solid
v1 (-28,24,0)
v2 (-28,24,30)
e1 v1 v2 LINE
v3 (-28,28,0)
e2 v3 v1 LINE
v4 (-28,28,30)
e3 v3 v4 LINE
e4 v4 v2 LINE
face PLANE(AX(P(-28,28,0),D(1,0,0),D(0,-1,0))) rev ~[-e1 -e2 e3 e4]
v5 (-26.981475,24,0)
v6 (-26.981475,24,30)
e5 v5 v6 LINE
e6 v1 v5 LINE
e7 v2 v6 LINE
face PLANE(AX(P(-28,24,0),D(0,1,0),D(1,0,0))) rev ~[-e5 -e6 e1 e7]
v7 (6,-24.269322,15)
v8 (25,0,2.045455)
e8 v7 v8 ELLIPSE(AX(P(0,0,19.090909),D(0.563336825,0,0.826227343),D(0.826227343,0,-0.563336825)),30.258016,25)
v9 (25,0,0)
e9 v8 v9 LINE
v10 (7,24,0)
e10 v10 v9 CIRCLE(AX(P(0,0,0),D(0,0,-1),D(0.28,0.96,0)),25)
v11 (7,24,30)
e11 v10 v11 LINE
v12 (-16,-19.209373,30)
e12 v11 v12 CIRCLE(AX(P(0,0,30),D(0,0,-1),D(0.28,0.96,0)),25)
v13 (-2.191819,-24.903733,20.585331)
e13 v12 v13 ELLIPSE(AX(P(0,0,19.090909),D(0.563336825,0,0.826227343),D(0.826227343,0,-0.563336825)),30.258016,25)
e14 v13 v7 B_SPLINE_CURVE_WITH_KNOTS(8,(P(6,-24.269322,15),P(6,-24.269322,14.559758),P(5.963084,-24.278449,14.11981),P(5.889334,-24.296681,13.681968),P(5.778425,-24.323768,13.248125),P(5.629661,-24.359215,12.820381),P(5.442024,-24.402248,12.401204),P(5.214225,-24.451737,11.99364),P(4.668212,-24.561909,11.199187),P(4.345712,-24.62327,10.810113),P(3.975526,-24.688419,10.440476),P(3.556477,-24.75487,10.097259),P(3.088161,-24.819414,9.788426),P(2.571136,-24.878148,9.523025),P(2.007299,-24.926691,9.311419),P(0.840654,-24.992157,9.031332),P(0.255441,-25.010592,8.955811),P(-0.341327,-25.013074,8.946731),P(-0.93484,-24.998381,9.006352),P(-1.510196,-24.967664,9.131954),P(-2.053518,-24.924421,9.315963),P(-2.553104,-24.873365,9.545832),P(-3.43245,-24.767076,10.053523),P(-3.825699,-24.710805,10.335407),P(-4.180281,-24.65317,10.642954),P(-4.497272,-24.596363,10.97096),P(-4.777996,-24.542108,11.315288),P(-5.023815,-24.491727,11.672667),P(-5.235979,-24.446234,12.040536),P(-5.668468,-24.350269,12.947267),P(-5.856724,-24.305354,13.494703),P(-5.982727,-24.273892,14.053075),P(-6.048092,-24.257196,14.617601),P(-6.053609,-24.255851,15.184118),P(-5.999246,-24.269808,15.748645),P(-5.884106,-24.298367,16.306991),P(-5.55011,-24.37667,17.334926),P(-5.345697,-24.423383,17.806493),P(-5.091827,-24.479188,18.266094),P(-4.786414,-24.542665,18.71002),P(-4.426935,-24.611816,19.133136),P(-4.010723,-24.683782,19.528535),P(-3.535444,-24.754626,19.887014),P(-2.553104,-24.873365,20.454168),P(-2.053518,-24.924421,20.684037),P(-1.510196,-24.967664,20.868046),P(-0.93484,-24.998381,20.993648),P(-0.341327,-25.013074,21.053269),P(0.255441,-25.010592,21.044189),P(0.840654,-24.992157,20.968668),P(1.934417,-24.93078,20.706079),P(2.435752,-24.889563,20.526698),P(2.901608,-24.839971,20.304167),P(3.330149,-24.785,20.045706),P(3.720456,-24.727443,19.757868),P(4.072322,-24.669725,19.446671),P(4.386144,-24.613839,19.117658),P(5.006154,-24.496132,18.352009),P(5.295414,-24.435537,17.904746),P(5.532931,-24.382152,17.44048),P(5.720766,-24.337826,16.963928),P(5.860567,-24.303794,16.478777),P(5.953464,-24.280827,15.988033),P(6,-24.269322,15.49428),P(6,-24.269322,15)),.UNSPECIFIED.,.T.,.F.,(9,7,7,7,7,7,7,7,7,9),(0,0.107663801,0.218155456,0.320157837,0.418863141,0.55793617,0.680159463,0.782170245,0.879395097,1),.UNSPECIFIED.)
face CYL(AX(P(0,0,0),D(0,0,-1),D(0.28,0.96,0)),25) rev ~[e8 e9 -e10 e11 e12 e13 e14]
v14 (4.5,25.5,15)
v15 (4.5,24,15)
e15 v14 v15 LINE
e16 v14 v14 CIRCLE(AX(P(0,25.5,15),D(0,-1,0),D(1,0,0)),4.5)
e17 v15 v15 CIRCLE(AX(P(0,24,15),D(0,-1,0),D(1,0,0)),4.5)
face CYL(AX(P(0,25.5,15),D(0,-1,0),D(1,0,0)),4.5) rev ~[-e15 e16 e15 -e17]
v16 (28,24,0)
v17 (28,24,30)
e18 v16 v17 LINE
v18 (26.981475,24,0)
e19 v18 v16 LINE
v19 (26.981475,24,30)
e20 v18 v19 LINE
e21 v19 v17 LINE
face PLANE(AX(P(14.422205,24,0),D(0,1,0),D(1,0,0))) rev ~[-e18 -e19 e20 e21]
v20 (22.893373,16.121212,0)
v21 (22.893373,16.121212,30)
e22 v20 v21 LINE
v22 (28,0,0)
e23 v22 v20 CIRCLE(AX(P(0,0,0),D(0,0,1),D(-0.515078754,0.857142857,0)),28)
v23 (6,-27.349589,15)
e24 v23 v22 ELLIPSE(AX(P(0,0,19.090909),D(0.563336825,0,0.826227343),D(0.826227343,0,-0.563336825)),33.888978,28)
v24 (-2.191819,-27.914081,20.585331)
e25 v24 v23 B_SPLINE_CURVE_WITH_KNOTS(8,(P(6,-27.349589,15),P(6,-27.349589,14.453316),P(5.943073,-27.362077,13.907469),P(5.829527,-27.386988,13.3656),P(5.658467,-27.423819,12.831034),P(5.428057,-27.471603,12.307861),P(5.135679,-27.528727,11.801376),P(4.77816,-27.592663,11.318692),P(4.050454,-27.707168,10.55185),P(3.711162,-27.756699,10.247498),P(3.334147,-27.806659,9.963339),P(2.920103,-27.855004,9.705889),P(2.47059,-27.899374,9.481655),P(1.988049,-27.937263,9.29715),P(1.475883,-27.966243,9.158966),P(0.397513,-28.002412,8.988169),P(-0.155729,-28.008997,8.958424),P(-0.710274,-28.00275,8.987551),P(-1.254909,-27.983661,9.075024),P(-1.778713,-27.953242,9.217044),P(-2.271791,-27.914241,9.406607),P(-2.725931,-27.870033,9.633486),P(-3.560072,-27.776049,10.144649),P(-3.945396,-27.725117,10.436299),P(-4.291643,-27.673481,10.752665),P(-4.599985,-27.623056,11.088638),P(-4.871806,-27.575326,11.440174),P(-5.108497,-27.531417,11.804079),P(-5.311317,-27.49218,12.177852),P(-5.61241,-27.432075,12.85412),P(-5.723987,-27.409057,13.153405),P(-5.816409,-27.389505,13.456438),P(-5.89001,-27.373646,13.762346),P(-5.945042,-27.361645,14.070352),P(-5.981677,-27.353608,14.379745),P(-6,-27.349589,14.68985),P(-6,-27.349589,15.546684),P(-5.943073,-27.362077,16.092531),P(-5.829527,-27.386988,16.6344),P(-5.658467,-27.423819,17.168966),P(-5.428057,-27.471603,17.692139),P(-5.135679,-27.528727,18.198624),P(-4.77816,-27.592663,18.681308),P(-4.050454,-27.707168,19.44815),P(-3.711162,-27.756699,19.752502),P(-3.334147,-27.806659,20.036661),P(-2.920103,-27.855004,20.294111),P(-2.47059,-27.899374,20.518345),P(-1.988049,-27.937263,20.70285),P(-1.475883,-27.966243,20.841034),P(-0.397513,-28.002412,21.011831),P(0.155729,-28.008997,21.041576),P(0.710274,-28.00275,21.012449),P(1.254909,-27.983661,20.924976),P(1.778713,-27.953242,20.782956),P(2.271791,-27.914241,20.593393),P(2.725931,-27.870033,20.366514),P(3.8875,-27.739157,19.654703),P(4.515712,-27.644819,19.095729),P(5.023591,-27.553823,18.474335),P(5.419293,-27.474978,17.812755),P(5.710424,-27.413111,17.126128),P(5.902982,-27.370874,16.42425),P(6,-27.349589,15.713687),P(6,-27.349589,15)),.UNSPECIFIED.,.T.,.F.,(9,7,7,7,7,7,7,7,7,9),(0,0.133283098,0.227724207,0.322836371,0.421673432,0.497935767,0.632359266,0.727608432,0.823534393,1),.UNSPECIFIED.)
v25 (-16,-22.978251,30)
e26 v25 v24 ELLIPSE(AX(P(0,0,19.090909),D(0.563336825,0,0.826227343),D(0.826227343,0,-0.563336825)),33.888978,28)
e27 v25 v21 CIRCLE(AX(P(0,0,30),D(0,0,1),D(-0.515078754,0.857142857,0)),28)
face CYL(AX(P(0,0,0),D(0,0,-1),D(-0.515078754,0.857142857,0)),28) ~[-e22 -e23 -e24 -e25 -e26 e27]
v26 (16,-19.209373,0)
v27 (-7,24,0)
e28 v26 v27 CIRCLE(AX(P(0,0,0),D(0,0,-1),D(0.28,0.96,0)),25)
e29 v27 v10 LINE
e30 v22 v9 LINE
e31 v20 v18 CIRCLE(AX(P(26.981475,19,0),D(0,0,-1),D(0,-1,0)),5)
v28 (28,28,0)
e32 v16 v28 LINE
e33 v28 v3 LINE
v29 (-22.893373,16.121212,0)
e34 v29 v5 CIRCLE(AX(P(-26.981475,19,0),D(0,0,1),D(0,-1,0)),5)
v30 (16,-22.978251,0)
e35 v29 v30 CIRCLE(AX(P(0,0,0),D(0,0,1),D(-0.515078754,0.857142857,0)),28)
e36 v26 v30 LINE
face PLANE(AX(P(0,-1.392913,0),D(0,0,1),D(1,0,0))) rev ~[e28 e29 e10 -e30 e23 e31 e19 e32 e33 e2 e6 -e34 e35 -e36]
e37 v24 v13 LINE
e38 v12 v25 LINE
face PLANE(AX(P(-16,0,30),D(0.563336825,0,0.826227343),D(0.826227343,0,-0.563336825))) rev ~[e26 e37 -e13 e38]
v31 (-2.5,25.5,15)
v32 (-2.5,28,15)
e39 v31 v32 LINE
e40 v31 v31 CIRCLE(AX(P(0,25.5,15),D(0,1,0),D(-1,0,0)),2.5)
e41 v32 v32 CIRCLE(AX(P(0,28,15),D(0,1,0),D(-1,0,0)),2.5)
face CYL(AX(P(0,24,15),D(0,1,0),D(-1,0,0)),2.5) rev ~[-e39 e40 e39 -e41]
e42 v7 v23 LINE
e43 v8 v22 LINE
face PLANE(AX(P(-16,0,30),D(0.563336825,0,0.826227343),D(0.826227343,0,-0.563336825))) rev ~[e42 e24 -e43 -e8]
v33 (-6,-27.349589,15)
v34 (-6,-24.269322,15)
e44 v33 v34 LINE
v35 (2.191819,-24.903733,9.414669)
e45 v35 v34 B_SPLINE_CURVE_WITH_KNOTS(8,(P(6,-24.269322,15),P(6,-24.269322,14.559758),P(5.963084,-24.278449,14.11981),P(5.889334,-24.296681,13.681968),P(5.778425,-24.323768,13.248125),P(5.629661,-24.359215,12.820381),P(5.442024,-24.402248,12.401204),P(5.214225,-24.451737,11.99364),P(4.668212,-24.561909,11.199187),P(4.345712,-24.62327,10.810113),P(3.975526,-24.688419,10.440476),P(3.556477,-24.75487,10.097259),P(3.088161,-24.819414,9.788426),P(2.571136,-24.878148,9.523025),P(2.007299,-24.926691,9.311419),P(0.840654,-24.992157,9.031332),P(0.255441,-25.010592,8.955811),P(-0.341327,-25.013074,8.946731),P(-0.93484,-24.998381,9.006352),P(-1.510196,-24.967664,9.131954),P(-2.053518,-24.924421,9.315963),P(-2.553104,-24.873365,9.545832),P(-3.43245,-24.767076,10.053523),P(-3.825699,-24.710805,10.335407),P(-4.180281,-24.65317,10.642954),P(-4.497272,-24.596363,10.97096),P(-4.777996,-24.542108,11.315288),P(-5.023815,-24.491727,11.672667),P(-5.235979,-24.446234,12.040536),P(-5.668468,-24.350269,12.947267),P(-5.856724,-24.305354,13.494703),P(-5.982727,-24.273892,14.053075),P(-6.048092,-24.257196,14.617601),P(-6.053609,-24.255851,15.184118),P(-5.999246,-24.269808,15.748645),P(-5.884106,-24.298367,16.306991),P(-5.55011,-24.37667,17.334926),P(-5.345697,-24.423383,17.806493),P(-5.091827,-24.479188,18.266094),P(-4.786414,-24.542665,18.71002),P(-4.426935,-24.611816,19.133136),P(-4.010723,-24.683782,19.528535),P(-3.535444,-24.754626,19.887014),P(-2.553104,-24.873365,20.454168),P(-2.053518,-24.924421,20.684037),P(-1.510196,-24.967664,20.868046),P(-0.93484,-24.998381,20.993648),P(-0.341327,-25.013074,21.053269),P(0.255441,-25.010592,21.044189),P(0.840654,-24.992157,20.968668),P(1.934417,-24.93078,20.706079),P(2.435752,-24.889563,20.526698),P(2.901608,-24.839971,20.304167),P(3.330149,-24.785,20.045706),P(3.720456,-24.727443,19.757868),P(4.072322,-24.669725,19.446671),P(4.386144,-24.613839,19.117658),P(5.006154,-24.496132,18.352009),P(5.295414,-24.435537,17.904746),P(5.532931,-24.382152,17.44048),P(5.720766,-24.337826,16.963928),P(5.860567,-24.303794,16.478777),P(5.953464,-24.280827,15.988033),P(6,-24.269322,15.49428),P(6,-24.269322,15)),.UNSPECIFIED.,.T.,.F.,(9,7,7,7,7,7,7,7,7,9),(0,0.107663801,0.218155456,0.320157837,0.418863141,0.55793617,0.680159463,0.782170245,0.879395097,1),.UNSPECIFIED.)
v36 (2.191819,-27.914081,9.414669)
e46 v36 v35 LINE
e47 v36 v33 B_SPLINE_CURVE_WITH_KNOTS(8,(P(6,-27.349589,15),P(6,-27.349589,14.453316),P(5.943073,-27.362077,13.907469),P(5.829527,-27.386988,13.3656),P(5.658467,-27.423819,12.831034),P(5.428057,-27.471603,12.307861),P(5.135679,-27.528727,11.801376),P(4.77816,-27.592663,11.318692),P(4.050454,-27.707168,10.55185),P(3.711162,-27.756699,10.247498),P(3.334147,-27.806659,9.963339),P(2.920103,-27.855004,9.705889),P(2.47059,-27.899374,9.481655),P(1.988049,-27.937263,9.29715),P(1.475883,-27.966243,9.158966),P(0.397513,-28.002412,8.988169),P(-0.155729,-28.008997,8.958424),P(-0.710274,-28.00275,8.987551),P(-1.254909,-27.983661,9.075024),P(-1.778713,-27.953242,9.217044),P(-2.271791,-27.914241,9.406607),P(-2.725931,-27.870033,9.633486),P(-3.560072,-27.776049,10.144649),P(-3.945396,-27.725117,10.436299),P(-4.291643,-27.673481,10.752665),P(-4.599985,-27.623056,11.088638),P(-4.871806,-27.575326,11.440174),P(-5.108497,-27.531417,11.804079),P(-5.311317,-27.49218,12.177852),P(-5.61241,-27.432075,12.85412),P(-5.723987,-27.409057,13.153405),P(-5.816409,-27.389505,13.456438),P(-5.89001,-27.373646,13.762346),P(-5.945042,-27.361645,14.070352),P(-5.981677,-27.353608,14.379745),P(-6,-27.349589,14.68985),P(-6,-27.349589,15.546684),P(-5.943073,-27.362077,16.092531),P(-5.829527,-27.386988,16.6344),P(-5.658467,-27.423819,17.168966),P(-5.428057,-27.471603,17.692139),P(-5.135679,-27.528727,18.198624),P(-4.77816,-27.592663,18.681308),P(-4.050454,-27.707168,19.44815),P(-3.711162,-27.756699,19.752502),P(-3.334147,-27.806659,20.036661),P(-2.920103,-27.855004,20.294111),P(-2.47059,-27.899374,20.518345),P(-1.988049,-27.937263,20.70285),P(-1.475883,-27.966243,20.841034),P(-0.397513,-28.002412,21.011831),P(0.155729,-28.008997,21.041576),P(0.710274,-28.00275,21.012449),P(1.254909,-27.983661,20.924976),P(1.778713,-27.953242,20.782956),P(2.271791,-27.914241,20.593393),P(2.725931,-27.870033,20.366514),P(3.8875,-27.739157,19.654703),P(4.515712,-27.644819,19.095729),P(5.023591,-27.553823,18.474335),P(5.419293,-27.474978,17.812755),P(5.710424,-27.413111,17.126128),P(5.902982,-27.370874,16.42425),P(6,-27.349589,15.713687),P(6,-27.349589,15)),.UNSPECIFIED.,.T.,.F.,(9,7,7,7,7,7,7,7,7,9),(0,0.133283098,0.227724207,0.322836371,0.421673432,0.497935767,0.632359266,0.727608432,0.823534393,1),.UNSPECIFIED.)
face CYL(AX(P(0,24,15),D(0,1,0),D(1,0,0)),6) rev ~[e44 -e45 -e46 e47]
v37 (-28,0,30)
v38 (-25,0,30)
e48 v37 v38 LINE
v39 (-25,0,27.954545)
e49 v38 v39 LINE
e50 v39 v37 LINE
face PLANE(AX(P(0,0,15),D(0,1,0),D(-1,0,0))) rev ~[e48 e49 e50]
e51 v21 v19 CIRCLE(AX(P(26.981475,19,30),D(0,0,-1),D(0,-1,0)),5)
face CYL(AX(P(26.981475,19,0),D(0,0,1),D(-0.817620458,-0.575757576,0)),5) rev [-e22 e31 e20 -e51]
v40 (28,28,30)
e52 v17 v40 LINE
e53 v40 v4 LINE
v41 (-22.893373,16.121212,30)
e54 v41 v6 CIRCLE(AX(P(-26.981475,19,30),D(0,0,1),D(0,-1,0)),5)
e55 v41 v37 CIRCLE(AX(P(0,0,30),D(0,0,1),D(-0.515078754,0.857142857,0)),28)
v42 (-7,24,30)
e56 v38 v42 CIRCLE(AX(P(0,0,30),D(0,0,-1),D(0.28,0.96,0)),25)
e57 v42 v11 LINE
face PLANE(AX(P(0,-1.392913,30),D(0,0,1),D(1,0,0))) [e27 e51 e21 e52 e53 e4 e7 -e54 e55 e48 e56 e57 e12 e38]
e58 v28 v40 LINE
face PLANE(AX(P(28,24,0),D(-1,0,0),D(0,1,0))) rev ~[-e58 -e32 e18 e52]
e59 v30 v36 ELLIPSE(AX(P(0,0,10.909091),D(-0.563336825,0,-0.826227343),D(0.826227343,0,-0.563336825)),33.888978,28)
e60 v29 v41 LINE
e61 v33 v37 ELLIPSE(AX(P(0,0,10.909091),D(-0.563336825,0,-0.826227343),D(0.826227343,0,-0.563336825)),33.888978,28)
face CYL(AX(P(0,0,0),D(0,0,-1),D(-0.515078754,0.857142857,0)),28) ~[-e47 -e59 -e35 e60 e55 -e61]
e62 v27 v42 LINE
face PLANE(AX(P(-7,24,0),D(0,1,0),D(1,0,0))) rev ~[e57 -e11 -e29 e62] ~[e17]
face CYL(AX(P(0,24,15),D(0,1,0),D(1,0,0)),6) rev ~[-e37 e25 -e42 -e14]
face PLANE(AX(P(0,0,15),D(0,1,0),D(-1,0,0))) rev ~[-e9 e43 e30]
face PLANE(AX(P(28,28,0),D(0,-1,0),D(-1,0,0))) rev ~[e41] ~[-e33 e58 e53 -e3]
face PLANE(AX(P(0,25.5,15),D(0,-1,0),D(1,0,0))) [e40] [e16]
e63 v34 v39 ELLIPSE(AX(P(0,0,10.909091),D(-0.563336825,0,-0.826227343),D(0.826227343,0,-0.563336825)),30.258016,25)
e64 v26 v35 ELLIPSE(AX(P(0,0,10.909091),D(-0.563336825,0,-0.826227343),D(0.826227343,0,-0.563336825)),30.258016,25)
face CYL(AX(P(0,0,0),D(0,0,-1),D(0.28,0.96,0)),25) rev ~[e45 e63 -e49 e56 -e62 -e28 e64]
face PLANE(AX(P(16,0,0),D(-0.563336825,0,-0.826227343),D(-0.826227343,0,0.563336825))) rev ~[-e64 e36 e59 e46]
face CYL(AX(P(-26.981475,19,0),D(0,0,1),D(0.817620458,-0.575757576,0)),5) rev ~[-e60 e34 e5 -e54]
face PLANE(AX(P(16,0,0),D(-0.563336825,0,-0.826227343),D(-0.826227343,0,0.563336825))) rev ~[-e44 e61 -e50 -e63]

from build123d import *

# Parameters (mm, degrees)
F1_DEPTH       = 30
F2_R           = 5
F4_START       = -28
F4_DEPTH       = 28.001
F6_D           = 5
F6_CBORE_D     = 9
F6_CBORE_DEPTH = 1.5
F7_D           = 12
F7_DEPTH       = 52.001


with BuildPart() as f1:
    # F0 (on Top) → F1 (new body)
    with BuildSketch(Plane.XY):
        with BuildLine():
            ThreePointArc((7, 24), (0, -25), (-7, 24))
            Line((-7, 24), (-14.4222051019, 24))
            ThreePointArc((-14.4222051019, 24), (0, -28), (14.4222051019, 24))
            Line((14.4222051019, 24), (7, 24))
        make_face()
        Polygon((-14.4222051019, 24), (-7, 24), (7, 24), (14.4222051019, 24), (28, 24), (28, 28), (-28, 28), (-28, 24), align=None)
    extrude(amount=F1_DEPTH)

    # F2
    f2_edges = [f1.edges().sort_by_distance(p)[0] for p in [
        (-14.422205, 24, 15),
        (14.422205, 24, 15),
    ]]
    fillet(f2_edges, radius=F2_R)

    # F3 (on face) → F4 (cut)
    with BuildSketch(Plane(origin=(0, 28, 0), x_dir=(-1, 0, 0), z_dir=(0, 1, 0)).offset(F4_START)):
        Polygon((28, 30), (16, 30), (-28, 0), (-16, 0), align=None)
    extrude(amount=-F4_DEPTH, mode=Mode.SUBTRACT)

    # F6 (through all)
    with Locations(Plane.XZ.offset(-24)):
        with Locations((0, 15)):
            CounterBoreHole(F6_D / 2, F6_CBORE_D / 2, F6_CBORE_DEPTH)

    # F7 (through all, one way)
    with BuildSketch(Plane(origin=(0, 24, 0), x_dir=(1, 0, 0), z_dir=(0, 1, 0))):
        with Locations((0, -15)):
            Circle(F7_D / 2)
    extrude(amount=-F7_DEPTH, mode=Mode.SUBTRACT)


solid = f1.part
